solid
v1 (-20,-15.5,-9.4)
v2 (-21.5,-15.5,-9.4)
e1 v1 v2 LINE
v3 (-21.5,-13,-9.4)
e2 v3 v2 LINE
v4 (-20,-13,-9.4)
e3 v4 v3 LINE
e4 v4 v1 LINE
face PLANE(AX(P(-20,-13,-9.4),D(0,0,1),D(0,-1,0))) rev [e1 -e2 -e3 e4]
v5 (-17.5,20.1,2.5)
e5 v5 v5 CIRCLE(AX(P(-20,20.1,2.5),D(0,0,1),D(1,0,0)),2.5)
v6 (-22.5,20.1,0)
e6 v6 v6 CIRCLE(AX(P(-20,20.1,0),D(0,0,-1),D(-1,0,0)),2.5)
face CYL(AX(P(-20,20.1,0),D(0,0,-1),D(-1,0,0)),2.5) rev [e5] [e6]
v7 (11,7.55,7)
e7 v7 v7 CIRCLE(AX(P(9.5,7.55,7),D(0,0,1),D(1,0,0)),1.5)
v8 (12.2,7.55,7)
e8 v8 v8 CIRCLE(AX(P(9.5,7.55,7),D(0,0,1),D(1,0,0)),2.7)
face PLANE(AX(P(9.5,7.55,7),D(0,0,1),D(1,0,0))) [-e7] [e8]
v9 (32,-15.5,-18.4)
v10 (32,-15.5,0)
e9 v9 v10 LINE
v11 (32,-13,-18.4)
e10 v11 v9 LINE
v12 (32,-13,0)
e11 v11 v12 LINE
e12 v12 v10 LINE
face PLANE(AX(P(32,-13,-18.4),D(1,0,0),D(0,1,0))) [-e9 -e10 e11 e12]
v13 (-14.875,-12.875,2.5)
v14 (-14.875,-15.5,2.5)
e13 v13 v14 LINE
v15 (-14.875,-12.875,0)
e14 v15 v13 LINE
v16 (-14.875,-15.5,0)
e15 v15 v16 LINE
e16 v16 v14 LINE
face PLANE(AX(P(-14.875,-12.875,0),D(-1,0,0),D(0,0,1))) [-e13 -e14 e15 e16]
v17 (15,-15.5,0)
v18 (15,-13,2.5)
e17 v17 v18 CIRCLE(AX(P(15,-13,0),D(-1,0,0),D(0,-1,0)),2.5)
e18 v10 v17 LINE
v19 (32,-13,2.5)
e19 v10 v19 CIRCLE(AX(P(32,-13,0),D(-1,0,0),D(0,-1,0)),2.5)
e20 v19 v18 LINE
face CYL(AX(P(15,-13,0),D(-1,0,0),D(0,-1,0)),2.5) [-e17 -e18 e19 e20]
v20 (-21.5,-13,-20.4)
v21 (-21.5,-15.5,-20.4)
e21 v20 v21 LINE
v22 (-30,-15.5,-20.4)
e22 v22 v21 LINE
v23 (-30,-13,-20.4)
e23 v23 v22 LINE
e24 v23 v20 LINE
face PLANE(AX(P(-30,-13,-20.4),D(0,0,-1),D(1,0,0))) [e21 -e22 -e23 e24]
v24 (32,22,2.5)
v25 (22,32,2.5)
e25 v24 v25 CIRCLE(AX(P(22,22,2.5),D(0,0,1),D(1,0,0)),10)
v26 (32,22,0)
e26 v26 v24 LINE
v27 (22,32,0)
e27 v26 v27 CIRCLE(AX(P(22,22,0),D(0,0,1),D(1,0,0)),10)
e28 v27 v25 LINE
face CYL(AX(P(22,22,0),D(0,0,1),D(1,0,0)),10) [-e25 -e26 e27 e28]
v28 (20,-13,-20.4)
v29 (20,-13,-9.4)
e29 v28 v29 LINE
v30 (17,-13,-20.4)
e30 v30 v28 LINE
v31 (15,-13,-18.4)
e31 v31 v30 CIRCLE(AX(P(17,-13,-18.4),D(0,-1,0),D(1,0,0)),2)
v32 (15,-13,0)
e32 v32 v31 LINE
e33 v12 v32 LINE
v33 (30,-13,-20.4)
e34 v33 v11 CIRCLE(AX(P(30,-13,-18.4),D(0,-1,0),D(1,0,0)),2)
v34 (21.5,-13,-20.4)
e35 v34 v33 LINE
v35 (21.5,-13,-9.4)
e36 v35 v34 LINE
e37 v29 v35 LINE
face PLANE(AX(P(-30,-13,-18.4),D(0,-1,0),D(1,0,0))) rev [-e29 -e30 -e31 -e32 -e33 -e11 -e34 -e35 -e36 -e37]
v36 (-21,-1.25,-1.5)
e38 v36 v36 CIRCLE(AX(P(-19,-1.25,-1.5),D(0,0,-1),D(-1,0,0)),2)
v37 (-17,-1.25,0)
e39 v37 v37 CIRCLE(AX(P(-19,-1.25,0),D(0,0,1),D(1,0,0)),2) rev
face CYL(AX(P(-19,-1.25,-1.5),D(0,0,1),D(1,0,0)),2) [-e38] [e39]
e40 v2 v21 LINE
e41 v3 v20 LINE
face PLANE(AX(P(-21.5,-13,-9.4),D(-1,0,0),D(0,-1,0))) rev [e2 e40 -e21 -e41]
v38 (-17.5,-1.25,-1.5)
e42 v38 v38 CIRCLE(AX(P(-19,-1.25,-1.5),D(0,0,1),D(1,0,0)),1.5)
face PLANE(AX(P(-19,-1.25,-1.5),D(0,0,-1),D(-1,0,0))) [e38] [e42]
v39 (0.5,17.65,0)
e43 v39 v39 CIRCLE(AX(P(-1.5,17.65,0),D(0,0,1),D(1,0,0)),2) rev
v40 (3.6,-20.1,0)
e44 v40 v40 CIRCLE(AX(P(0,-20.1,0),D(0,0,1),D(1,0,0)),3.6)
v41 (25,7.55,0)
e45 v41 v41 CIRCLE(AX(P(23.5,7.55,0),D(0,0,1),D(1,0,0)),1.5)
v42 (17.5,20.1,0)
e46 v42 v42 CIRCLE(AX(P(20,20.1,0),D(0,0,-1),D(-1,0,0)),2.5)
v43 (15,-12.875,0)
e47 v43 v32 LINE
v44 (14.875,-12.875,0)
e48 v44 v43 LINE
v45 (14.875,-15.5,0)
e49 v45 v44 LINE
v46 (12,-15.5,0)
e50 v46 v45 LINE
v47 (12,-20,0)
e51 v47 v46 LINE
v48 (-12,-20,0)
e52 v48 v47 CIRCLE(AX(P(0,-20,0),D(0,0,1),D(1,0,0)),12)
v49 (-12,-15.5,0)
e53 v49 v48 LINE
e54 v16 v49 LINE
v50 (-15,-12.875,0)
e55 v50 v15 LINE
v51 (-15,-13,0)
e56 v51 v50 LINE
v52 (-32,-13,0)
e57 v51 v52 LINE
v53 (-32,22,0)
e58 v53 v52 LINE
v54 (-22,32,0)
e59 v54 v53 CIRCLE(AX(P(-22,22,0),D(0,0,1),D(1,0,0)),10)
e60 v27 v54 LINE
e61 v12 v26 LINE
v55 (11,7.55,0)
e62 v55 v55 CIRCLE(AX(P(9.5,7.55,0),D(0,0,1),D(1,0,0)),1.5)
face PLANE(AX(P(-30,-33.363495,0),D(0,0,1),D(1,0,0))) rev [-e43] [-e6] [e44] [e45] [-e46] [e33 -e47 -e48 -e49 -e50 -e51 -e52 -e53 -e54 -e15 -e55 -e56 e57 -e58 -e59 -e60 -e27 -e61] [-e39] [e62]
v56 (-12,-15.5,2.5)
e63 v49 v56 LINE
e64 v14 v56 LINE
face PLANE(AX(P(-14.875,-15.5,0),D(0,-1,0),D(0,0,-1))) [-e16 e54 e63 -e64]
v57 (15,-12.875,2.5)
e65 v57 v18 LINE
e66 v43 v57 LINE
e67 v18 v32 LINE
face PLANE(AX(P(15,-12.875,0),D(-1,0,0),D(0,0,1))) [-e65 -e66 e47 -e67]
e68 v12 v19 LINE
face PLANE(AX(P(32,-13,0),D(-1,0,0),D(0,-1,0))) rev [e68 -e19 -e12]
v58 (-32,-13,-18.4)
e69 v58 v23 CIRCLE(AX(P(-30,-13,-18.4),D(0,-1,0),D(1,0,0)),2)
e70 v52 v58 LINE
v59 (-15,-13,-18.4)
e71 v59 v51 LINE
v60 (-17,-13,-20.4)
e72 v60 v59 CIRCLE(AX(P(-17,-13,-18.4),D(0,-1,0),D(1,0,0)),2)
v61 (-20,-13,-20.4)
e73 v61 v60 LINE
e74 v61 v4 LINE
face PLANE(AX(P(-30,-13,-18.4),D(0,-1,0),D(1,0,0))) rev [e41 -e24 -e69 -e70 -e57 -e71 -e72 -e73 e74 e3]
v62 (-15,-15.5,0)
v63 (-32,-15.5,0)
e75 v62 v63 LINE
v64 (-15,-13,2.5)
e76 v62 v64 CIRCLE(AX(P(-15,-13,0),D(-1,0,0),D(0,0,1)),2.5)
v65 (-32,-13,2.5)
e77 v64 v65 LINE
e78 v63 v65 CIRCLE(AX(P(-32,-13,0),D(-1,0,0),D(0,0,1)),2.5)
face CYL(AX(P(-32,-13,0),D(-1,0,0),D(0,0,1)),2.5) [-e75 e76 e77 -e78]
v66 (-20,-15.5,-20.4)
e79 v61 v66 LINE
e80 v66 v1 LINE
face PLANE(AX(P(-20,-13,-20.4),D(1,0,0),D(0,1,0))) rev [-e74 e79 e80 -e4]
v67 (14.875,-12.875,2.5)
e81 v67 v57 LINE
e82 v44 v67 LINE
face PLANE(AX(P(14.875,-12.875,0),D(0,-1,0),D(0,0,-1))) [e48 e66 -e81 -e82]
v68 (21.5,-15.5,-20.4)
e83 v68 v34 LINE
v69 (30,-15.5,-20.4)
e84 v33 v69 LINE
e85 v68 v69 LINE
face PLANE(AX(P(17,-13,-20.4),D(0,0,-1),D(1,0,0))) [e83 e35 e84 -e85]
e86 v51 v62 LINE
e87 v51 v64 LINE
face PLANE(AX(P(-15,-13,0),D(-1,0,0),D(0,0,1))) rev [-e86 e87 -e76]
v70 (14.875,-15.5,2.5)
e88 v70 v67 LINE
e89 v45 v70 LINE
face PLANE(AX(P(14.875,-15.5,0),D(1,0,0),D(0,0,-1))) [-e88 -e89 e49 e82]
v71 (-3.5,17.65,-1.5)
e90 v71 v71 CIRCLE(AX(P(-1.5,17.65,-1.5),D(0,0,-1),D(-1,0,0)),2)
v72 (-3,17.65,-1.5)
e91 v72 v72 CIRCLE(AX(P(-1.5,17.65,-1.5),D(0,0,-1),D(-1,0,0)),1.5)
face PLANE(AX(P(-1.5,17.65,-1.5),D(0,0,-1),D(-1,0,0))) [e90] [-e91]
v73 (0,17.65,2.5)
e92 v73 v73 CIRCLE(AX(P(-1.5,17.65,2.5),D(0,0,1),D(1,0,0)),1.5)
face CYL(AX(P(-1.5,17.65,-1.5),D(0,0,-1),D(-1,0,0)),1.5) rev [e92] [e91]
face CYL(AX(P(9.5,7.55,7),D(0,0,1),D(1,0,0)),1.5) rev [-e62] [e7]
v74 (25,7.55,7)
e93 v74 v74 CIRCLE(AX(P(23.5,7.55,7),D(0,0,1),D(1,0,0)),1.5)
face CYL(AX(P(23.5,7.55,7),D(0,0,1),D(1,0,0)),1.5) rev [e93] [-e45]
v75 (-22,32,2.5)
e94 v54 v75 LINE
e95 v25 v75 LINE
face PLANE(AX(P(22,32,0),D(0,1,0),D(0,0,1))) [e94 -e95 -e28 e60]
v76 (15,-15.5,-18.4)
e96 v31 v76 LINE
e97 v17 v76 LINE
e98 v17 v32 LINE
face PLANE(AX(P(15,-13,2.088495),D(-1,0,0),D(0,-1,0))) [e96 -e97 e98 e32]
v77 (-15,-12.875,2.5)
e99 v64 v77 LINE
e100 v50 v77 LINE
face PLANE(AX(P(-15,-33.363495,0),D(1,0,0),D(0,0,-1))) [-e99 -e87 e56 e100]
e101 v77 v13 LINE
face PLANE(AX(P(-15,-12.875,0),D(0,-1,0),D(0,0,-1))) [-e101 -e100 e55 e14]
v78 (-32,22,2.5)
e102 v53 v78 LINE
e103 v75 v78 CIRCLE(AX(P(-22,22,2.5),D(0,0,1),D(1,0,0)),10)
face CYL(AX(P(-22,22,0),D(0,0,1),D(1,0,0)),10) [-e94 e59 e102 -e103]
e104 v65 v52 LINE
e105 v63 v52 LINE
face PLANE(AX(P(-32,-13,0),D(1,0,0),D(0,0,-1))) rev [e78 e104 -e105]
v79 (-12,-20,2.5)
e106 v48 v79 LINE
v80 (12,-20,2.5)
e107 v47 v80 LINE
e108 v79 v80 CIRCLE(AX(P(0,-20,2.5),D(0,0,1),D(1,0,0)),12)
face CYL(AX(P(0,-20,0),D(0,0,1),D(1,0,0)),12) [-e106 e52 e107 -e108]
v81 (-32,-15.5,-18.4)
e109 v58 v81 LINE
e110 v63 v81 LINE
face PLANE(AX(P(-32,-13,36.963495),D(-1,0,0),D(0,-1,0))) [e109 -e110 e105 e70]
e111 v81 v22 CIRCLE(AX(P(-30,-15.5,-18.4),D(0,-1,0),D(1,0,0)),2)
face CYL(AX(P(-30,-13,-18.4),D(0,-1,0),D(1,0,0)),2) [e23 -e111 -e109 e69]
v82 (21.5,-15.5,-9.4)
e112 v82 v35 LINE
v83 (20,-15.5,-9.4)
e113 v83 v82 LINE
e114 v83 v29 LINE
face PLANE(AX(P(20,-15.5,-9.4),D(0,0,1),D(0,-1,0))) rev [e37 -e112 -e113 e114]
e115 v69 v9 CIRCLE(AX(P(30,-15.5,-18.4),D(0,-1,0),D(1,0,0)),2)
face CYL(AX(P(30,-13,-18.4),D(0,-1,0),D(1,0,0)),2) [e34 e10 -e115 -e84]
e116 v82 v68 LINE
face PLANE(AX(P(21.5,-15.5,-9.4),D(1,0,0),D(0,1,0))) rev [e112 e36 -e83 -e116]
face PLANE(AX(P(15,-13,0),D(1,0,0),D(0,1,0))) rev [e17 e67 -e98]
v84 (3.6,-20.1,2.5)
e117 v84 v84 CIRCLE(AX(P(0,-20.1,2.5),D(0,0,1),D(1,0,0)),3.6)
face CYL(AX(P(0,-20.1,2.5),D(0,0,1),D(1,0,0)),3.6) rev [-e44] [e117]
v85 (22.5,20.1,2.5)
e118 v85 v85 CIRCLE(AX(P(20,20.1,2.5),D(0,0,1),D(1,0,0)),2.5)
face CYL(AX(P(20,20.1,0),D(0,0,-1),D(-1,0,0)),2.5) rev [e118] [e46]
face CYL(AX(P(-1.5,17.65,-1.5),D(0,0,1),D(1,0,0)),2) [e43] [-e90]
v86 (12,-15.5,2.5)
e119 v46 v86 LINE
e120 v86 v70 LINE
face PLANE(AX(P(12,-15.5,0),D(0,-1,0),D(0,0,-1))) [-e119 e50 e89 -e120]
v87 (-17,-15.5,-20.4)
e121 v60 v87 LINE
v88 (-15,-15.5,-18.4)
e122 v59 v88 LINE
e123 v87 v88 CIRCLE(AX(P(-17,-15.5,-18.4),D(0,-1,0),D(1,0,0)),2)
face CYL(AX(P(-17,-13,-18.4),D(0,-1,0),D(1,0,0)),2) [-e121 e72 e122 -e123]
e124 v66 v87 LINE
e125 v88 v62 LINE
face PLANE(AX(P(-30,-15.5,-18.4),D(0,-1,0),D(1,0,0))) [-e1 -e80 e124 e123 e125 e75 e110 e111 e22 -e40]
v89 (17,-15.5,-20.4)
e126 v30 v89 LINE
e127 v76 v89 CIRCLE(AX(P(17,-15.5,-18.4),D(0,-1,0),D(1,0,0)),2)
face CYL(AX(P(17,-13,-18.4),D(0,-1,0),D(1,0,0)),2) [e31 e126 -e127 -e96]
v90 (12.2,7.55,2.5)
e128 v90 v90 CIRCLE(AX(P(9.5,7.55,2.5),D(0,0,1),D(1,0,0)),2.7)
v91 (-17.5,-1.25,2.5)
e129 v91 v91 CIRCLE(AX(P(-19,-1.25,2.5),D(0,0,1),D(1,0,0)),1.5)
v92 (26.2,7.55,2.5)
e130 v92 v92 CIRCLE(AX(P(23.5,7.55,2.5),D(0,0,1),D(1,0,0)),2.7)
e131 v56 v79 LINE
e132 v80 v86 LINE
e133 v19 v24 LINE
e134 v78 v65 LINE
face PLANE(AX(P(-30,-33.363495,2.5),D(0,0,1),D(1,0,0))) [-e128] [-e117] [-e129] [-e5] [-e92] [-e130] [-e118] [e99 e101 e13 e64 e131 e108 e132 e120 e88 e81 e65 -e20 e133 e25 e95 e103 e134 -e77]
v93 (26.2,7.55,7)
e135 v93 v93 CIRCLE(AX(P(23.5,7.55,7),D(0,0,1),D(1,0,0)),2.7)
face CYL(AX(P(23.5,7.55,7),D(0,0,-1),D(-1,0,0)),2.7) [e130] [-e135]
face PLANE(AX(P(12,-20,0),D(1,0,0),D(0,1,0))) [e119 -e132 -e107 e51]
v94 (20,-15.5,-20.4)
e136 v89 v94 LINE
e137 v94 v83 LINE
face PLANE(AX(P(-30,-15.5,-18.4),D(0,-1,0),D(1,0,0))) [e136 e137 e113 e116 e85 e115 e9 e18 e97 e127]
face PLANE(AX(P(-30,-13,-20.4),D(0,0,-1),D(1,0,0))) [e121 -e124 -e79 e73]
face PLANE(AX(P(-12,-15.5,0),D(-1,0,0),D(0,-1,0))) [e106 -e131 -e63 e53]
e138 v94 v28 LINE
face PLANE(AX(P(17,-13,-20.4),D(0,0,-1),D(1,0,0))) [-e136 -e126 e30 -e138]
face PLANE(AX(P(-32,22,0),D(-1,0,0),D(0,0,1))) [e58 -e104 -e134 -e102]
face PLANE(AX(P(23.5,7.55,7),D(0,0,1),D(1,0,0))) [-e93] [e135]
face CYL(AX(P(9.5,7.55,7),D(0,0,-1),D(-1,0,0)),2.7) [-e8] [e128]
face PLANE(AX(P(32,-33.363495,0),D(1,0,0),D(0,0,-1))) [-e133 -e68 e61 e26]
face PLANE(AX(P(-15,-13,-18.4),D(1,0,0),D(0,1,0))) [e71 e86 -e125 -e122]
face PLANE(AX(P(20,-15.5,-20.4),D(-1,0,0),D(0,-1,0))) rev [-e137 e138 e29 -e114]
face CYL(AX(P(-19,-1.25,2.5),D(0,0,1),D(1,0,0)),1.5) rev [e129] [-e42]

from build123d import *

# Parameters (mm, degrees)
BRIDA_BASE1_DEPTH                   = 2.5
CROQUIS16_W                         = 1.5
CROQUIS16_H                         = 11
CORTAR_EXTRUIR1_DEPTH               = 48.758002549
CROQUIS17_W                         = 1.5
CROQUIS17_H                         = 11
CORTAR_EXTRUIR2_DEPTH               = 48.758002549
CROQUIS18_R                         = 2
SALIENTE_EXTRUIR1_DEPTH             = 1.5
CROQUIS19_R                         = 2.7
SALIENTE_EXTRUIR2_DEPTH             = 4.5
CROQUIS20_R                         = 2.7
SALIENTE_EXTRUIR3_DEPTH             = 4.5
CROQUIS21_R                         = 2
SALIENTE_EXTRUIR4_DEPTH             = 1.5
DI_METRO_DE_TALADRO_3_0_3_1_D       = 3
DI_METRO_DE_TALADRO_3_0_3_2_D       = 3
DI_METRO_DE_TALADRO_3_0_3_2_DEPTH   = 8.5
DI_METRO_DE_TALADRO_7_2_7_2_1_D     = 7.2
DI_METRO_DE_TALADRO_7_2_7_2_1_DEPTH = 4
DI_METRO_DE_TALADRO_3_0_3_3_D       = 3
DI_METRO_DE_TALADRO_3_0_3_3_DEPTH   = 8.5
DI_METRO_DE_TALADRO_5_0_5_1_D       = 5
DI_METRO_DE_TALADRO_5_0_5_1_DEPTH   = 7
PLIEGUE_START                       = -35.363495408
PLIEGUE_CROQUIZADO1_OUTLINE_W       = 17
PLIEGUE_CROQUIZADO1_OUTLINE_H       = 2.5
PLIEGUE_CROQUIZADO1_DEPTH           = 19.863495408
PLIEGUE_START_2                     = -15.5
PLIEGUE_CROQUIZADO1_2_DEPTH         = 2.5
PLIEGUE_START_3                     = 15
PLIEGUE_CROQUIZADO1_3_DEPTH         = 18
PLIEGUE_CROQUIZADO2_OUTLINE_W       = 17
PLIEGUE_CROQUIZADO2_OUTLINE_H       = 2.5
PLIEGUE_CROQUIZADO2_DEPTH           = 19.863495408
PLIEGUE_CROQUIZADO2_2_DEPTH         = 2.5
PLIEGUE_START_4                     = -33
PLIEGUE_CROQUIZADO2_3_DEPTH         = 18


with BuildPart() as part:
    # Brida base1: sheet metal written as solids
    # Croquis11 → Brida base1 (new body)
    with BuildSketch(Plane.XY.offset(2.5)):
        with BuildLine():
            Line((-30, -35.363495408), (-17, -35.363495408))
            ThreePointArc((-17, -35.363495408), (-15.585786438, -34.777708971), (-15, -33.363495408))
            Line((-15, -33.363495408), (-15, -12.875))
            Line((-15, -12.875), (-14.875, -12.875))
            Line((-14.875, -12.875), (-14.875, -15.5))
            Line((-14.875, -15.5), (-12, -15.5))
            Line((-12, -15.5), (-12, -20))
            ThreePointArc((-12, -20), (0, -32), (12, -20))
            Line((12, -20), (12, -15.5))
            Line((12, -15.5), (14.875, -15.5))
            Line((14.875, -15.5), (14.875, -12.875))
            Line((14.875, -12.875), (15, -12.875))
            Line((15, -12.875), (15, -33.363495408))
            ThreePointArc((15, -33.363495408), (15.585786438, -34.777708971), (17, -35.363495408))
            Line((17, -35.363495408), (30, -35.363495408))
            ThreePointArc((30, -35.363495408), (31.414213562, -34.777708971), (32, -33.363495408))
            Line((32, -33.363495408), (32, 22))
            ThreePointArc((32, 22), (29.071067812, 29.071067812), (22, 32))
            Line((22, 32), (-22, 32))
            ThreePointArc((-22, 32), (-29.071067812, 29.071067812), (-32, 22))
            Line((-32, 22), (-32, -33.363495408))
            ThreePointArc((-32, -33.363495408), (-31.414213562, -34.777708971), (-30, -35.363495408))
        make_face()
    extrude(amount=-BRIDA_BASE1_DEPTH)

    # Croquis16 → Cortar-Extruir1 (cut, through all)
    with BuildSketch(Plane.XY.offset(2.5)):
        with Locations((-20.75, -29.863495408)):
            Rectangle(CROQUIS16_W, CROQUIS16_H)
    extrude(amount=-CORTAR_EXTRUIR1_DEPTH, mode=Mode.SUBTRACT)

    # Croquis17 → Cortar-Extruir2 (cut, through all)
    with BuildSketch(Plane(origin=(0, 0, 0), x_dir=(-1, 0, 0), z_dir=(0, 0, -1))):
        with Locations((-20.75, -29.863495408)):
            Rectangle(CROQUIS17_W, CROQUIS17_H)
    extrude(amount=-CORTAR_EXTRUIR2_DEPTH, mode=Mode.SUBTRACT)

    # Croquis18 → Saliente-Extruir1 (add)
    with BuildSketch(Plane(origin=(0, 0, 0), x_dir=(-1, 0, 0), z_dir=(0, 0, -1))):
        with Locations(Location((1.5, 17.65, 0), (0, 0, 180))):
            Circle(CROQUIS18_R)
    extrude(amount=SALIENTE_EXTRUIR1_DEPTH)

    # Croquis19 → Saliente-Extruir2 (add)
    with BuildSketch(Plane.XY.offset(2.5)):
        with Locations((23.5, 7.55)):
            Circle(CROQUIS19_R)
    extrude(amount=SALIENTE_EXTRUIR2_DEPTH)

    # Croquis20 → Saliente-Extruir3 (add)
    with BuildSketch(Plane.XY.offset(2.5)):
        with Locations((9.5, 7.55)):
            Circle(CROQUIS20_R)
    extrude(amount=SALIENTE_EXTRUIR3_DEPTH)

    # Croquis21 → Saliente-Extruir4 (add)
    with BuildSketch(Plane(origin=(0, 0, 0), x_dir=(-1, 0, 0), z_dir=(0, 0, -1))):
        with Locations(Location((19, -1.25, 0), (0, 0, 180))):
            Circle(CROQUIS21_R)
    extrude(amount=SALIENTE_EXTRUIR4_DEPTH)

    # Diámetro de taladro Ø3.0 (3)1 (through all)
    with Locations(Plane.XY.offset(2.5)):
        with Locations((-19, -1.25)):
            Hole(DI_METRO_DE_TALADRO_3_0_3_1_D / 2)

    # Diámetro de taladro Ø3.0 (3)2
    with Locations(Plane.XY.offset(7)):
        with Locations((23.5, 7.55), (9.5, 7.55)):
            Hole(DI_METRO_DE_TALADRO_3_0_3_2_D / 2, depth=DI_METRO_DE_TALADRO_3_0_3_2_DEPTH)

    # Diámetro de taladro Ø7.2 (7.2)1
    with Locations(Plane.XY.offset(2.5)):
        with Locations((0, -20.1)):
            Hole(DI_METRO_DE_TALADRO_7_2_7_2_1_D / 2, depth=DI_METRO_DE_TALADRO_7_2_7_2_1_DEPTH)

    # Diámetro de taladro Ø3.0 (3)3
    with Locations(Plane(origin=(0, 0, -1.5), x_dir=(-1, 0, 0), z_dir=(0, 0, -1))):
        with Locations((1.5, 17.65)):
            Hole(DI_METRO_DE_TALADRO_3_0_3_3_D / 2, depth=DI_METRO_DE_TALADRO_3_0_3_3_DEPTH)

    # Diámetro de taladro Ø5.0 (5)1
    with Locations(Plane(origin=(0, 0, 0), x_dir=(-1, 0, 0), z_dir=(0, 0, -1))):
        with Locations((20, 20.1), (-20, 20.1)):
            Hole(DI_METRO_DE_TALADRO_5_0_5_1_D / 2, depth=DI_METRO_DE_TALADRO_5_0_5_1_DEPTH)

    # Pliegue croquizado1: read off the stored shape, not the designer's step
    # Pliegue croquizado1 outline → Pliegue croquizado1 (cut)
    with BuildSketch(Plane(origin=(0, 0, 0), x_dir=(1, 0, 0), z_dir=(0, 1, 0)).offset(PLIEGUE_START)):
        with Locations((23.5, -1.25)):
            Rectangle(PLIEGUE_CROQUIZADO1_OUTLINE_W, PLIEGUE_CROQUIZADO1_OUTLINE_H)
    extrude(amount=PLIEGUE_CROQUIZADO1_DEPTH, mode=Mode.SUBTRACT)

    # Pliegue croquizado1 2 outline → Pliegue croquizado1 2 (add)
    with BuildSketch(Plane(origin=(0, 0, 0), x_dir=(1, 0, 0), z_dir=(0, 1, 0)).offset(PLIEGUE_START_2)):
        with BuildLine():
            Line((15, 0), (32, 0))
            Line((32, 0), (32, 18.4))
            ThreePointArc((32, 18.4), (31.414213562, 19.814213562), (30, 20.4))
            Line((30, 20.4), (21.5, 20.4))
            Line((21.5, 20.4), (21.5, 9.4))
            Line((21.5, 9.4), (20, 9.4))
            Line((20, 9.4), (20, 20.4))
            Line((20, 20.4), (17, 20.4))
            ThreePointArc((17, 20.4), (15.585786438, 19.814213562), (15, 18.4))
            Line((15, 18.4), (15, 0))
        make_face()
    extrude(amount=PLIEGUE_CROQUIZADO1_2_DEPTH)

    # Pliegue croquizado1 3 outline → Pliegue croquizado1 3 (cut)
    with BuildSketch(Plane.YZ.offset(PLIEGUE_START_3)):
        with BuildLine():
            Line((-15.5, 2.5), (-15.5, 0))
            ThreePointArc((-15.5, 0), (-14.767766953, 1.767766953), (-13, 2.5))
            Line((-13, 2.5), (-15.5, 2.5))
        make_face()
    extrude(amount=PLIEGUE_CROQUIZADO1_3_DEPTH, mode=Mode.SUBTRACT)

    # Pliegue croquizado2: read off the stored shape, not the designer's step
    # Pliegue croquizado2 outline → Pliegue croquizado2 (cut)
    with BuildSketch(Plane(origin=(0, 0, 0), x_dir=(1, 0, 0), z_dir=(0, 1, 0)).offset(PLIEGUE_START)):
        with Locations((-23.5, -1.25)):
            Rectangle(PLIEGUE_CROQUIZADO2_OUTLINE_W, PLIEGUE_CROQUIZADO2_OUTLINE_H)
    extrude(amount=PLIEGUE_CROQUIZADO2_DEPTH, mode=Mode.SUBTRACT)

    # Pliegue croquizado2 2 outline → Pliegue croquizado2 2 (add)
    with BuildSketch(Plane(origin=(0, 0, 0), x_dir=(1, 0, 0), z_dir=(0, 1, 0)).offset(PLIEGUE_START_2)):
        with BuildLine():
            ThreePointArc((-30, 20.4), (-31.414213562, 19.814213562), (-32, 18.4))
            Line((-32, 18.4), (-32, 0))
            Line((-32, 0), (-15, 0))
            Line((-15, 0), (-15, 18.4))
            ThreePointArc((-15, 18.4), (-15.585786438, 19.814213562), (-17, 20.4))
            Line((-17, 20.4), (-20, 20.4))
            Line((-20, 20.4), (-20, 9.4))
            Line((-20, 9.4), (-21.5, 9.4))
            Line((-21.5, 9.4), (-21.5, 20.4))
            Line((-21.5, 20.4), (-30, 20.4))
        make_face()
    extrude(amount=PLIEGUE_CROQUIZADO2_2_DEPTH)

    # Pliegue croquizado2 3 outline → Pliegue croquizado2 3 (cut)
    with BuildSketch(Plane.YZ.offset(PLIEGUE_START_4)):
        with BuildLine():
            Line((-15.5, 2.5), (-15.5, 0))
            ThreePointArc((-15.5, 0), (-14.767766953, 1.767766953), (-13, 2.5))
            Line((-13, 2.5), (-15.5, 2.5))
        make_face()
    extrude(amount=PLIEGUE_CROQUIZADO2_3_DEPTH, mode=Mode.SUBTRACT)


solid = part.part
